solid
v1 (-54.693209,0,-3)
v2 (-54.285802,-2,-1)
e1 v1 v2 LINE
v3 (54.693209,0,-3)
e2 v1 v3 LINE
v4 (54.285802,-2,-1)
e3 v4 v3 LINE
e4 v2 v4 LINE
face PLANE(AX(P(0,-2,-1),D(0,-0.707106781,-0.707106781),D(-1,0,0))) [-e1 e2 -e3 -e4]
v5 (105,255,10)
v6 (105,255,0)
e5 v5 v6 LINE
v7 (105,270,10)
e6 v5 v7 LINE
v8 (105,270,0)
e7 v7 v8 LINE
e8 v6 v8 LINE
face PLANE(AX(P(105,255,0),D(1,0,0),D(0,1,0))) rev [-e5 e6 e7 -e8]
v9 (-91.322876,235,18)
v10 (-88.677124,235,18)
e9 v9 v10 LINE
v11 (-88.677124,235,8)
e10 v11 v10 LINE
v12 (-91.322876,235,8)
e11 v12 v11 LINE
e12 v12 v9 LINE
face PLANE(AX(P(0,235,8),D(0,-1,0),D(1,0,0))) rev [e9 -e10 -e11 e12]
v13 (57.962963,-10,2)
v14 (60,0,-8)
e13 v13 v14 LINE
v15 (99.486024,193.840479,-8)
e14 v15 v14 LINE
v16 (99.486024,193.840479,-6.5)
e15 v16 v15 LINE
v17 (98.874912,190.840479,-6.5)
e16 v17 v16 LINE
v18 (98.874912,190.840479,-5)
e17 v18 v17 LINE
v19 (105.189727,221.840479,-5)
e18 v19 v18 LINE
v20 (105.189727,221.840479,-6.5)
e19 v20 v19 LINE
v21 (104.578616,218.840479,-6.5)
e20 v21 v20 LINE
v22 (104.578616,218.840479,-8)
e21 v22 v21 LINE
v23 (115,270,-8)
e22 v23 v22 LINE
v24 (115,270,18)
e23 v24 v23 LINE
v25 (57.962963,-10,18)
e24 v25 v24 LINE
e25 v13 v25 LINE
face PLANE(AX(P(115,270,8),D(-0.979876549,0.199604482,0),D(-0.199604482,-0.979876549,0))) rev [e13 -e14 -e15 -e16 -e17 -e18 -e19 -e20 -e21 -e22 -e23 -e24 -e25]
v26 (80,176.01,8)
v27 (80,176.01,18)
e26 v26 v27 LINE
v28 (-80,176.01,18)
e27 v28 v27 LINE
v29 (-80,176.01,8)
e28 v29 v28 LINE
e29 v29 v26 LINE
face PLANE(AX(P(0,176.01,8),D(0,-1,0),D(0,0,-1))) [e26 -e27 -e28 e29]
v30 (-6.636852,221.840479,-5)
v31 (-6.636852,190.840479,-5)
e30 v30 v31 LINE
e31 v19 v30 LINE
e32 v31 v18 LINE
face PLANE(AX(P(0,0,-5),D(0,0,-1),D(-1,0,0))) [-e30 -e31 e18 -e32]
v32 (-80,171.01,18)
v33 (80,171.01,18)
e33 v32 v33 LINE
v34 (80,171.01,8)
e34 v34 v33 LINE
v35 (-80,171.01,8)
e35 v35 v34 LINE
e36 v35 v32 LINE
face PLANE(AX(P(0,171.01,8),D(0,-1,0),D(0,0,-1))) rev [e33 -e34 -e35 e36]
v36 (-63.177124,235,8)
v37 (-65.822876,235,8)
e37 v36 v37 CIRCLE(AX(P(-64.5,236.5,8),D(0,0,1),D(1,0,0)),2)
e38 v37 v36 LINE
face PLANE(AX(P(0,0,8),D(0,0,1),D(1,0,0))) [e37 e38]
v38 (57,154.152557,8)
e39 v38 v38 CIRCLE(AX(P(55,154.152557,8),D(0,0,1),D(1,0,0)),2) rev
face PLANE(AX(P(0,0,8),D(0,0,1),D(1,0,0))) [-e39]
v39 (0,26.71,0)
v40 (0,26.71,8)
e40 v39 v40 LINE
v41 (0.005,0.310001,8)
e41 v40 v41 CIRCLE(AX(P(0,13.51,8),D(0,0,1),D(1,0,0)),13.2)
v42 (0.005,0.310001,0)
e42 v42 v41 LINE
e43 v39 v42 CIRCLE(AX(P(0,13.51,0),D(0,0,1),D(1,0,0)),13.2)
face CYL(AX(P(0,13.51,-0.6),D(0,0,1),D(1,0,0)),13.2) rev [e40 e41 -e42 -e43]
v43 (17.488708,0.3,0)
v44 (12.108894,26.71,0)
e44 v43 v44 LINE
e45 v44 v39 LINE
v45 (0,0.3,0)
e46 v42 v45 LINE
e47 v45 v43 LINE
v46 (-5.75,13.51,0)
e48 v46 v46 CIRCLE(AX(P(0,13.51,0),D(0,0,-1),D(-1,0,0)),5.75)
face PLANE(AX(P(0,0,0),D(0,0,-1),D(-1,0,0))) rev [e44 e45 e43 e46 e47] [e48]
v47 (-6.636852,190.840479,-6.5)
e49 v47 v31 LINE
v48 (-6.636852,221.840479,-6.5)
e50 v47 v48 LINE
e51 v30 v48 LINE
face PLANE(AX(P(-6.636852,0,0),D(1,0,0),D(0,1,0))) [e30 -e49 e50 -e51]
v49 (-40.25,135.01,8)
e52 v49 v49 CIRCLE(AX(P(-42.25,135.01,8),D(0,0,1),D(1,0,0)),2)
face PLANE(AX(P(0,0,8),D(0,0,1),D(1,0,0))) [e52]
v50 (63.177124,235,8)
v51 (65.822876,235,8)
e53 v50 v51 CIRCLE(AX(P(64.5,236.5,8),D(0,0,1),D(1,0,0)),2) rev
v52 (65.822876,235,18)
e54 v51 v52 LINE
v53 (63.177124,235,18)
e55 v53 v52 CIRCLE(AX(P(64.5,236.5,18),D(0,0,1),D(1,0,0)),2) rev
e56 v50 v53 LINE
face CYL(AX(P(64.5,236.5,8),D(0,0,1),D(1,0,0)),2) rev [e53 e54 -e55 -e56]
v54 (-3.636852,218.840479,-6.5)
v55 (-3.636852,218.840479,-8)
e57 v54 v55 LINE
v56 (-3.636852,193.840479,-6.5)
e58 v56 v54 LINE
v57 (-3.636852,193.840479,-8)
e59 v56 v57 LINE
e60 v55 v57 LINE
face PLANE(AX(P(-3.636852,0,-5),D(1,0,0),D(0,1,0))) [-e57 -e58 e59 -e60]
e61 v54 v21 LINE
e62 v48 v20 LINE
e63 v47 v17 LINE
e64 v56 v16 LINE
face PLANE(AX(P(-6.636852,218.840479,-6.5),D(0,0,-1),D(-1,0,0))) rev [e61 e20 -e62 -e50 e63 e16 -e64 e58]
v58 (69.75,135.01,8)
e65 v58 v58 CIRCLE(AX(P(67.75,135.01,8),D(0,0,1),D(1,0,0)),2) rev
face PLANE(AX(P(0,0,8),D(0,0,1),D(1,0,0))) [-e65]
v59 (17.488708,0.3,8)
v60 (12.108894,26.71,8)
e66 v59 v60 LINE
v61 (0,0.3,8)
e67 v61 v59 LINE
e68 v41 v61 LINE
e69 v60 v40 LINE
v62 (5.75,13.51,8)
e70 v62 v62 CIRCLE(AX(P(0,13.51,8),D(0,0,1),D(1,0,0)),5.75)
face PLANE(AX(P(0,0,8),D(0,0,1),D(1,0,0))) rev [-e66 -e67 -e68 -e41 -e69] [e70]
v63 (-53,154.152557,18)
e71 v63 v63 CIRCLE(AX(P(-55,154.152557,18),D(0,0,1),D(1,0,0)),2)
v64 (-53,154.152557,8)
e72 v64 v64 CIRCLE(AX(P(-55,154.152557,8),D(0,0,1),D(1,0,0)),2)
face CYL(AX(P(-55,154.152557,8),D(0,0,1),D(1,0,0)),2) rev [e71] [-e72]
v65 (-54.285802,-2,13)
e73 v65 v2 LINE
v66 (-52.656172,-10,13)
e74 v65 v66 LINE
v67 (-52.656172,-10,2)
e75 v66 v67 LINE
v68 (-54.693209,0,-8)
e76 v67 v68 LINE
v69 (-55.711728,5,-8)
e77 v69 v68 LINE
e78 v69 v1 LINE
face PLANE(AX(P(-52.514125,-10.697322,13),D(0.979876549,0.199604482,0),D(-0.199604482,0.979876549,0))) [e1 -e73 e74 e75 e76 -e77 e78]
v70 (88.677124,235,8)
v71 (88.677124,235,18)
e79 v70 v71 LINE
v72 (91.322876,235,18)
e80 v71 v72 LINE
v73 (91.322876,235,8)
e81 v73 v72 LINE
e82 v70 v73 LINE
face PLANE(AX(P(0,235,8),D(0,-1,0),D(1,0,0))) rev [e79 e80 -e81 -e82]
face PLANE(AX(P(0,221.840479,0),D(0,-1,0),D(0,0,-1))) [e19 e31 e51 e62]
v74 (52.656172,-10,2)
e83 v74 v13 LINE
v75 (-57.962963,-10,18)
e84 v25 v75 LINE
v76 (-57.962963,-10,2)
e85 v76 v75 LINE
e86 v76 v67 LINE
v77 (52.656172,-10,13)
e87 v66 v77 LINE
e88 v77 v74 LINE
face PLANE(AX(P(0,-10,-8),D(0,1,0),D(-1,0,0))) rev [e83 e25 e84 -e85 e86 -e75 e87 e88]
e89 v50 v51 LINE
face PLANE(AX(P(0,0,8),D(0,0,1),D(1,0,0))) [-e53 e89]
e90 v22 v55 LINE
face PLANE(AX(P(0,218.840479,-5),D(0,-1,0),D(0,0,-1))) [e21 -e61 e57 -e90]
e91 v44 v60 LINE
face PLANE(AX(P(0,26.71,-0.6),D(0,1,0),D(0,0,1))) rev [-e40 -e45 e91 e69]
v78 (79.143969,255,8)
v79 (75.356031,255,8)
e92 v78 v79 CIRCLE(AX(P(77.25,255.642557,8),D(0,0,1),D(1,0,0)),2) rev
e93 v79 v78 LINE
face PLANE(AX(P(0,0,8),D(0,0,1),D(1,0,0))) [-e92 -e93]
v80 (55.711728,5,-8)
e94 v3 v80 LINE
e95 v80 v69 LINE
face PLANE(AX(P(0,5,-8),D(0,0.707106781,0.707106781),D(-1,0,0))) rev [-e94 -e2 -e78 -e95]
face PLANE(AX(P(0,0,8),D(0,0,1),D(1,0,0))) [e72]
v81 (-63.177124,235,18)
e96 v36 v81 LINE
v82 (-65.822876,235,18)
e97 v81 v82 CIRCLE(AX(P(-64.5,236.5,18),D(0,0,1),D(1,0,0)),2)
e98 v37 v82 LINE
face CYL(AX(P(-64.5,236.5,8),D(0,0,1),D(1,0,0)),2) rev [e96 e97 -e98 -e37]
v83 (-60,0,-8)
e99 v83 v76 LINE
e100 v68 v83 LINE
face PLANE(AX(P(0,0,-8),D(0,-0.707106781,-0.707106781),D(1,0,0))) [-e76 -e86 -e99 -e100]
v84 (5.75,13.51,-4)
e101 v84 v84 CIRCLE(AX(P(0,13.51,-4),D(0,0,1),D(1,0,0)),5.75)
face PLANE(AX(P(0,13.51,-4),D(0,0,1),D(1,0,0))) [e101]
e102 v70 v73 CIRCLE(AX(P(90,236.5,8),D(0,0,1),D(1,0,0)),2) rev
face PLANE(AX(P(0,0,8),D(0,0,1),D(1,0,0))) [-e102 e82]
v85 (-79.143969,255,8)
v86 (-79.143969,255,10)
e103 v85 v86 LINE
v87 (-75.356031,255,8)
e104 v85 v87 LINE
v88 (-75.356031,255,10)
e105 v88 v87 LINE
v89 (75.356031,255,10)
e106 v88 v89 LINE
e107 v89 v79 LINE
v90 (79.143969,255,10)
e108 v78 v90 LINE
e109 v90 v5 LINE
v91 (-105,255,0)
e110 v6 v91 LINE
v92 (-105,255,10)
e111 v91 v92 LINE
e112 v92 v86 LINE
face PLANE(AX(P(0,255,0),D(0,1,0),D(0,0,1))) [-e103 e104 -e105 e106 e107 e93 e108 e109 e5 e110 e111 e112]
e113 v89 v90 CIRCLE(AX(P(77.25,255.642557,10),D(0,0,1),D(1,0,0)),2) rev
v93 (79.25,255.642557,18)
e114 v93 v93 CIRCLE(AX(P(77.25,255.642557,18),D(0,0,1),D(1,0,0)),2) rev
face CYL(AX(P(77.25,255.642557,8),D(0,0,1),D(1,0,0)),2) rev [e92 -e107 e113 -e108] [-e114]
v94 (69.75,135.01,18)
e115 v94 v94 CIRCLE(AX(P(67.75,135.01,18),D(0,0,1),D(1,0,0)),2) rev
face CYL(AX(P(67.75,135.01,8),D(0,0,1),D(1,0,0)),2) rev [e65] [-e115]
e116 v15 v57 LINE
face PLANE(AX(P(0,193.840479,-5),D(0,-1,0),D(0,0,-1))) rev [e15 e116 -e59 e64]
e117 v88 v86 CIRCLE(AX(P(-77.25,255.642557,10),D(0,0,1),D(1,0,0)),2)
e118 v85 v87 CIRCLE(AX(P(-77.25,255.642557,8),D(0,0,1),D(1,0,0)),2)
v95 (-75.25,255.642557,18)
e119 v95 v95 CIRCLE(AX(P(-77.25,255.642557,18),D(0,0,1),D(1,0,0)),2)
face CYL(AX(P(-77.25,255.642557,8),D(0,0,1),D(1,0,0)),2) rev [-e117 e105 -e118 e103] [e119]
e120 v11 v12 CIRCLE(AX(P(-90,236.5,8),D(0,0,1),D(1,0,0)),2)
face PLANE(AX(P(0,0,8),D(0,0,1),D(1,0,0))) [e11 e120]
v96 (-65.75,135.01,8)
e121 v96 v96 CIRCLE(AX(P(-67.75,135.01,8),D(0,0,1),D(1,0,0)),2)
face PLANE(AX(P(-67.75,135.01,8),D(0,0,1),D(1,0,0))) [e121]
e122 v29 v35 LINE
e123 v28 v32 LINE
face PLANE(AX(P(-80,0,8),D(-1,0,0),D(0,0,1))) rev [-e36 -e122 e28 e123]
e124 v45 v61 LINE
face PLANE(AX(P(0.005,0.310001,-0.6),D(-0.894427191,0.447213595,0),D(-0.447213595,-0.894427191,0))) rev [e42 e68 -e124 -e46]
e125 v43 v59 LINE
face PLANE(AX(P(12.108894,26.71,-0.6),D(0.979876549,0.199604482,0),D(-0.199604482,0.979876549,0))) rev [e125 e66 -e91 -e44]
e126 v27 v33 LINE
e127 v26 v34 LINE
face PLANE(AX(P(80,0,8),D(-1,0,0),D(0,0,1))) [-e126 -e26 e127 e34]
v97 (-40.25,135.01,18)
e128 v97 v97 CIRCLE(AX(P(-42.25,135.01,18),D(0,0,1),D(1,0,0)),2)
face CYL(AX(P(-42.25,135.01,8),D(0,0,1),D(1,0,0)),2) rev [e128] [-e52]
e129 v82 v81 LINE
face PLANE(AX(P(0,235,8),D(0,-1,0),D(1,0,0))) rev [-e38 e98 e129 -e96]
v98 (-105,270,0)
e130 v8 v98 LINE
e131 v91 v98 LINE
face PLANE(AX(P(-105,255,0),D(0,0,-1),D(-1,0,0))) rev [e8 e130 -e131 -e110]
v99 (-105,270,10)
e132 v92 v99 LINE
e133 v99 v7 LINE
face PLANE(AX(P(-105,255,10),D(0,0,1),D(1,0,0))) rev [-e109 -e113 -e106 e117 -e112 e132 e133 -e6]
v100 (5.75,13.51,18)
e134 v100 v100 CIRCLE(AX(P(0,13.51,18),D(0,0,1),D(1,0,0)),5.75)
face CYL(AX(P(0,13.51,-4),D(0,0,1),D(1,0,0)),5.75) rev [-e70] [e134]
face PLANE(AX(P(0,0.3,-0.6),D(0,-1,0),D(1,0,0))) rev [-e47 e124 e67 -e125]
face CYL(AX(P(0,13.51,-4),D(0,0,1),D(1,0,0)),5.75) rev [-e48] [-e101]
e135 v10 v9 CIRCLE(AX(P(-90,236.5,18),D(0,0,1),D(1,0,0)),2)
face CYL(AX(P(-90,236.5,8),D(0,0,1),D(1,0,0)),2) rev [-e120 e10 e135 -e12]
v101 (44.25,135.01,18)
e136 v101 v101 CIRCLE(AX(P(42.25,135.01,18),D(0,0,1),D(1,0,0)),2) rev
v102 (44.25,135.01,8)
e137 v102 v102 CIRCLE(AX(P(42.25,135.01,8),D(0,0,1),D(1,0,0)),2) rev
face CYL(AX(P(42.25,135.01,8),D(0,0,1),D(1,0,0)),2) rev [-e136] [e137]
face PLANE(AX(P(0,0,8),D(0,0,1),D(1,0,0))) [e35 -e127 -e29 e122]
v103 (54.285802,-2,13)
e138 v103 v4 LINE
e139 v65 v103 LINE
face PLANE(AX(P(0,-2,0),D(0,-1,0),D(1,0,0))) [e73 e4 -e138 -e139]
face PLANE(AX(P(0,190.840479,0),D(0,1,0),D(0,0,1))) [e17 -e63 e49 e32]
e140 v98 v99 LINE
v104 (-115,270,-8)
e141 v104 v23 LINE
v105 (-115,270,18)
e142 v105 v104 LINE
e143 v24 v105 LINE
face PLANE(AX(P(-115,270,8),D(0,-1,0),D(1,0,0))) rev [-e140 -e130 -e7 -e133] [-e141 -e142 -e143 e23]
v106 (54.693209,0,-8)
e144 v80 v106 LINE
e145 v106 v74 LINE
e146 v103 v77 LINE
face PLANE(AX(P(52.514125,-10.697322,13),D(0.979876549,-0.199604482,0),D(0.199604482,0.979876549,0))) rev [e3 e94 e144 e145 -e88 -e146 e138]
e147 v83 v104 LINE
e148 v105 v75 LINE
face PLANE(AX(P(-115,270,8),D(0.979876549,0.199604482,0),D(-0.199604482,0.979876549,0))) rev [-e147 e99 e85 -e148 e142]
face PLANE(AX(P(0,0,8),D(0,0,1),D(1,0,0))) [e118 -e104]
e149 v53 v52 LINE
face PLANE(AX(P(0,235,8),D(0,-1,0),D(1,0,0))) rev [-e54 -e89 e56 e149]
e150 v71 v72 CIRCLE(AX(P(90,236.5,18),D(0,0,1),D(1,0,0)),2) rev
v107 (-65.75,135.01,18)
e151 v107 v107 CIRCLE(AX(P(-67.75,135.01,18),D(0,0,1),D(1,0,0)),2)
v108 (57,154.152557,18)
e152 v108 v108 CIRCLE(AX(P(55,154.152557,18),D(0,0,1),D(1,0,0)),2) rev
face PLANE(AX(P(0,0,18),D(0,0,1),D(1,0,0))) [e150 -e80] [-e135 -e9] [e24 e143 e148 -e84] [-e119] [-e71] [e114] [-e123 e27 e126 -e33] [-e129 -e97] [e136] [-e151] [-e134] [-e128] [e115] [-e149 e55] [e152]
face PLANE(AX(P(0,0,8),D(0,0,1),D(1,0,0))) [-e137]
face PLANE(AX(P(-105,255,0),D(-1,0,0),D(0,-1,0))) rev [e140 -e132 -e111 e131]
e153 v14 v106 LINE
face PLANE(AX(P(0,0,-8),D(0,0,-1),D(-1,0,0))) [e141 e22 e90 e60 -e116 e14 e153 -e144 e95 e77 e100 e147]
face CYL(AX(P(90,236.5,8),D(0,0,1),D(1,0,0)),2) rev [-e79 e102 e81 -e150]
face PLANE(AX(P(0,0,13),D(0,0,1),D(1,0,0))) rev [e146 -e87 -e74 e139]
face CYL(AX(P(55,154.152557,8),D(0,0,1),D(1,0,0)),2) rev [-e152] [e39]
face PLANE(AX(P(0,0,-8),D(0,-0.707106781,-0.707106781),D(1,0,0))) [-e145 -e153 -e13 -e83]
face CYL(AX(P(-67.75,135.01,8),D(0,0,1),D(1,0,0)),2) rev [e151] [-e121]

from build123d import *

# Parameters (mm, degrees)
EXTRUDE_1_DEPTH      = 8
CUT_EXTRUDE_1_DEPTH  = 8.6
EXTRUDE_2_DEPTH      = 8
EXTRUDE_3_DEPTH      = 10
SKETCH_7_R           = 5.75
CUT_EXTRUDE_2_DEPTH  = 22
EXTRUDE_5_DEPTH      = 26
CUT_EXTRUDE_4_DEPTH  = 21
CHAMFER_6_SIZE       = 5
CHAMFER_8_SIZE       = 10
SKETCH_13_W          = 210
SKETCH_13_H          = 10
CUT_EXTRUDE_5_DEPTH  = 15
SKETCH_14_W          = 160
SKETCH_14_H          = 5
CUT_EXTRUDE_6_DEPTH  = 10
SKETCH_16_R          = 2
CUT_EXTRUDE_7_DEPTH  = 10
SKETCH_18_W          = 109.386418102
SKETCH_18_H          = 16
EXTRUDE_7_DEPTH      = 2
CHAMFER_10_SIZE      = 2
SKETCH_32_W          = 100
SKETCH_32_H          = 25
CUT_EXTRUDE_16_DEPTH = 3
SKETCH_33_W          = 3
SKETCH_33_H          = 25
CUT_EXTRUDE_17_DEPTH = 1003
SKETCH_34_W          = 1.5
SKETCH_34_H          = 25
CUT_EXTRUDE_19_DEPTH = 3
SKETCH_36_W          = 111.215468024
SKETCH_36_H          = 1.5
CUT_EXTRUDE_20_DEPTH = 3
CUT_EXTRUDE_21_DEPTH = 3
SKETCH_38_W          = 1.5
SKETCH_38_H          = 31
CUT_EXTRUDE_22_DEPTH = 1003


with BuildPart() as part:
    # 草图1 → 凸台-拉伸1 (new body)
    with BuildSketch(Plane.XY):
        Polygon((-60, 0), (60, 0), (115, 270), (-115, 270), align=None)
    extrude(amount=EXTRUDE_1_DEPTH)

    # 草图2 → 切除-拉伸1 (cut)
    with BuildSketch(Plane.XY.offset(8)):
        with BuildLine():
            Line((0.005000474, 0.310000947), (0, 0.3))
            Line((0, 0.3), (17.48870838, 0.3))
            Line((17.48870838, 0.3), (12.108893566, 26.71))
            Line((12.108893566, 26.71), (0, 26.71))
            ThreePointArc((0, 26.71), (-13.199999763, 13.507499763), (0.005000474, 0.310000947))
        make_face()
    extrude(amount=-CUT_EXTRUDE_1_DEPTH, mode=Mode.SUBTRACT)

    # 草图5 → 凸台-拉伸2 (add)
    with BuildSketch(Plane(origin=(0, 0, 0), x_dir=(-1, 0, 0), z_dir=(0, 0, -1))):
        Polygon((60, 0), (115, 270), (-115, 270), (-60, 0), align=None)
    extrude(amount=EXTRUDE_2_DEPTH)

    # 草图6 → 凸台-拉伸3 (add)
    with BuildSketch(Plane.XY.offset(8)):
        Polygon((-115, 270), (-60, 0), (60, 0), (115, 270), align=None)
    extrude(amount=EXTRUDE_3_DEPTH)

    # 草图7 → 切除-拉伸2 (cut)
    with BuildSketch(Plane.XY.offset(18)):
        with Locations((0, 13.51)):
            Circle(SKETCH_7_R)
    extrude(amount=-CUT_EXTRUDE_2_DEPTH, mode=Mode.SUBTRACT)

    # 草图9 → 凸台-拉伸5 (add)
    with BuildSketch(Plane.XY.offset(18)):
        Polygon((-57.962962963, -10), (-60, 0), (60, 0), (57.962962963, -10), align=None)
    extrude(amount=-EXTRUDE_5_DEPTH)

    # 草图12 → 切除-拉伸4 (cut)
    with BuildSketch(Plane.XY.offset(-8)):
        Polygon((54.693209051, 0), (-54.693209051, 0), (-52.656172014, -10), (52.656172014, -10), align=None)
    extrude(amount=CUT_EXTRUDE_4_DEPTH, mode=Mode.SUBTRACT)

    # 倒角6
    chamfer_6_edges = [part.edges().sort_by_distance(p)[0] for p in [
        (0, 0, -8),
    ]]
    chamfer(chamfer_6_edges, length=CHAMFER_6_SIZE)

    # 倒角8
    chamfer_8_edges = [part.edges().sort_by_distance(p)[0] for p in [
        (55.309567488, -10, -8),
        (-55.309567488, -10, -8),
    ]]
    chamfer(chamfer_8_edges, length=CHAMFER_8_SIZE)

    # 草图13 → 切除-拉伸5 (cut)
    with BuildSketch(Plane(origin=(0, 270, 0), x_dir=(1, 0, 0), z_dir=(0, 1, 0))):
        with Locations((0, -5)):
            Rectangle(SKETCH_13_W, SKETCH_13_H)
    extrude(amount=-CUT_EXTRUDE_5_DEPTH, mode=Mode.SUBTRACT)

    # 草图14 → 切除-拉伸6 (cut)
    with BuildSketch(Plane.XY.offset(18)):
        with Locations((0, 173.51)):
            Rectangle(SKETCH_14_W, SKETCH_14_H)
    extrude(amount=-CUT_EXTRUDE_6_DEPTH, mode=Mode.SUBTRACT)

    # 草图16 → 切除-拉伸7 (cut)
    with BuildSketch(Plane.XY.offset(18)):
        with BuildLine():
            ThreePointArc((-88.677124344, 235), (-90, 238.5), (-91.322875656, 235))
            Line((-91.322875656, 235), (-88.677124344, 235))
        make_face()
        with BuildLine():
            ThreePointArc((91.322875656, 235), (90, 238.5), (88.677124344, 235))
            Line((88.677124344, 235), (91.322875656, 235))
        make_face()
        with BuildLine():
            ThreePointArc((65.822875656, 235), (64.5, 238.5), (63.177124344, 235))
            Line((63.177124344, 235), (65.822875656, 235))
        make_face()
        with BuildLine():
            ThreePointArc((-63.177124344, 235), (-64.5, 238.5), (-65.822875656, 235))
            Line((-65.822875656, 235), (-63.177124344, 235))
        make_face()
        with Locations((-77.25, 255.6425573)):
            Circle(SKETCH_16_R)
        with Locations((77.25, 255.6425573)):
            Circle(SKETCH_16_R)
        with Locations((-55, 154.1525573)):
            Circle(SKETCH_16_R)
        with Locations((-67.75, 135.01)):
            Circle(SKETCH_16_R)
        with Locations((-42.25, 135.01)):
            Circle(SKETCH_16_R)
        with Locations((42.25, 135.01)):
            Circle(SKETCH_16_R)
        with Locations((67.75, 135.01)):
            Circle(SKETCH_16_R)
        with Locations((55, 154.1525573)):
            Circle(SKETCH_16_R)
    extrude(amount=-CUT_EXTRUDE_7_DEPTH, mode=Mode.SUBTRACT)

    # 草图18 → 凸台-拉伸7 (add)
    with BuildSketch(Plane.XZ):
        with Locations((0, 5)):
            Rectangle(SKETCH_18_W, SKETCH_18_H)
    extrude(amount=EXTRUDE_7_DEPTH)

    # 倒角10
    chamfer_10_edges = [part.edges().sort_by_distance(p)[0] for p in [
        (0, -2, -3),
    ]]
    chamfer(chamfer_10_edges, length=CHAMFER_10_SIZE - 0.0001)  # a hair under: the kernel refuses the full size

    # 草图32 → 切除-拉伸16 (cut)
    with BuildSketch(Plane(origin=(0, 0, -8), x_dir=(-1, 0, 0), z_dir=(0, 0, -1))):
        with Locations((-46.363148148, 206.34047939)):
            Rectangle(SKETCH_32_W, SKETCH_32_H)
    extrude(amount=-CUT_EXTRUDE_16_DEPTH, mode=Mode.SUBTRACT)

    # 草图33 → 切除-拉伸17 (cut)
    with BuildSketch(Plane(origin=(-3.636851852, 0, 0), x_dir=(0, 0, -1), z_dir=(1, 0, 0))):
        with Locations((6.5, 206.34047939)):
            Rectangle(SKETCH_33_W, SKETCH_33_H)
    extrude(amount=CUT_EXTRUDE_17_DEPTH, mode=Mode.SUBTRACT)

    # 草图34 → 切除-拉伸19 (cut)
    with BuildSketch(Plane(origin=(-3.636851852, 0, 0), x_dir=(0, 0, -1), z_dir=(1, 0, 0))):
        with Locations((5.75, 206.34047939)):
            Rectangle(SKETCH_34_W, SKETCH_34_H)
    extrude(amount=-CUT_EXTRUDE_19_DEPTH, mode=Mode.SUBTRACT)

    # 草图36 → 切除-拉伸20 (cut)
    with BuildSketch(Plane.XZ.offset(-218.84047939)):
        with Locations((48.97088216, -5.75)):
            Rectangle(SKETCH_36_W, SKETCH_36_H)
    extrude(amount=-CUT_EXTRUDE_20_DEPTH, mode=Mode.SUBTRACT)

    # 草图37 → 切除-拉伸21 (cut)
    with BuildSketch(Plane(origin=(0, 193.84047939, 0), x_dir=(1, 0, 0), z_dir=(0, 1, 0))):
        Polygon((-6.636851852, 6.5), (-6.636851852, 5), (99.486023579, 5), (99.486023579, 6.5), (-3.636851852, 6.5), align=None)
    extrude(amount=-CUT_EXTRUDE_21_DEPTH, mode=Mode.SUBTRACT)

    # 草图38 → 切除-拉伸22 (cut)
    with BuildSketch(Plane(origin=(-6.636851852, 0, 0), x_dir=(0, 0, -1), z_dir=(1, 0, 0))):
        with Locations((5.75, 206.34047939)):
            Rectangle(SKETCH_38_W, SKETCH_38_H)
    extrude(amount=CUT_EXTRUDE_22_DEPTH, mode=Mode.SUBTRACT)


solid = part.part
